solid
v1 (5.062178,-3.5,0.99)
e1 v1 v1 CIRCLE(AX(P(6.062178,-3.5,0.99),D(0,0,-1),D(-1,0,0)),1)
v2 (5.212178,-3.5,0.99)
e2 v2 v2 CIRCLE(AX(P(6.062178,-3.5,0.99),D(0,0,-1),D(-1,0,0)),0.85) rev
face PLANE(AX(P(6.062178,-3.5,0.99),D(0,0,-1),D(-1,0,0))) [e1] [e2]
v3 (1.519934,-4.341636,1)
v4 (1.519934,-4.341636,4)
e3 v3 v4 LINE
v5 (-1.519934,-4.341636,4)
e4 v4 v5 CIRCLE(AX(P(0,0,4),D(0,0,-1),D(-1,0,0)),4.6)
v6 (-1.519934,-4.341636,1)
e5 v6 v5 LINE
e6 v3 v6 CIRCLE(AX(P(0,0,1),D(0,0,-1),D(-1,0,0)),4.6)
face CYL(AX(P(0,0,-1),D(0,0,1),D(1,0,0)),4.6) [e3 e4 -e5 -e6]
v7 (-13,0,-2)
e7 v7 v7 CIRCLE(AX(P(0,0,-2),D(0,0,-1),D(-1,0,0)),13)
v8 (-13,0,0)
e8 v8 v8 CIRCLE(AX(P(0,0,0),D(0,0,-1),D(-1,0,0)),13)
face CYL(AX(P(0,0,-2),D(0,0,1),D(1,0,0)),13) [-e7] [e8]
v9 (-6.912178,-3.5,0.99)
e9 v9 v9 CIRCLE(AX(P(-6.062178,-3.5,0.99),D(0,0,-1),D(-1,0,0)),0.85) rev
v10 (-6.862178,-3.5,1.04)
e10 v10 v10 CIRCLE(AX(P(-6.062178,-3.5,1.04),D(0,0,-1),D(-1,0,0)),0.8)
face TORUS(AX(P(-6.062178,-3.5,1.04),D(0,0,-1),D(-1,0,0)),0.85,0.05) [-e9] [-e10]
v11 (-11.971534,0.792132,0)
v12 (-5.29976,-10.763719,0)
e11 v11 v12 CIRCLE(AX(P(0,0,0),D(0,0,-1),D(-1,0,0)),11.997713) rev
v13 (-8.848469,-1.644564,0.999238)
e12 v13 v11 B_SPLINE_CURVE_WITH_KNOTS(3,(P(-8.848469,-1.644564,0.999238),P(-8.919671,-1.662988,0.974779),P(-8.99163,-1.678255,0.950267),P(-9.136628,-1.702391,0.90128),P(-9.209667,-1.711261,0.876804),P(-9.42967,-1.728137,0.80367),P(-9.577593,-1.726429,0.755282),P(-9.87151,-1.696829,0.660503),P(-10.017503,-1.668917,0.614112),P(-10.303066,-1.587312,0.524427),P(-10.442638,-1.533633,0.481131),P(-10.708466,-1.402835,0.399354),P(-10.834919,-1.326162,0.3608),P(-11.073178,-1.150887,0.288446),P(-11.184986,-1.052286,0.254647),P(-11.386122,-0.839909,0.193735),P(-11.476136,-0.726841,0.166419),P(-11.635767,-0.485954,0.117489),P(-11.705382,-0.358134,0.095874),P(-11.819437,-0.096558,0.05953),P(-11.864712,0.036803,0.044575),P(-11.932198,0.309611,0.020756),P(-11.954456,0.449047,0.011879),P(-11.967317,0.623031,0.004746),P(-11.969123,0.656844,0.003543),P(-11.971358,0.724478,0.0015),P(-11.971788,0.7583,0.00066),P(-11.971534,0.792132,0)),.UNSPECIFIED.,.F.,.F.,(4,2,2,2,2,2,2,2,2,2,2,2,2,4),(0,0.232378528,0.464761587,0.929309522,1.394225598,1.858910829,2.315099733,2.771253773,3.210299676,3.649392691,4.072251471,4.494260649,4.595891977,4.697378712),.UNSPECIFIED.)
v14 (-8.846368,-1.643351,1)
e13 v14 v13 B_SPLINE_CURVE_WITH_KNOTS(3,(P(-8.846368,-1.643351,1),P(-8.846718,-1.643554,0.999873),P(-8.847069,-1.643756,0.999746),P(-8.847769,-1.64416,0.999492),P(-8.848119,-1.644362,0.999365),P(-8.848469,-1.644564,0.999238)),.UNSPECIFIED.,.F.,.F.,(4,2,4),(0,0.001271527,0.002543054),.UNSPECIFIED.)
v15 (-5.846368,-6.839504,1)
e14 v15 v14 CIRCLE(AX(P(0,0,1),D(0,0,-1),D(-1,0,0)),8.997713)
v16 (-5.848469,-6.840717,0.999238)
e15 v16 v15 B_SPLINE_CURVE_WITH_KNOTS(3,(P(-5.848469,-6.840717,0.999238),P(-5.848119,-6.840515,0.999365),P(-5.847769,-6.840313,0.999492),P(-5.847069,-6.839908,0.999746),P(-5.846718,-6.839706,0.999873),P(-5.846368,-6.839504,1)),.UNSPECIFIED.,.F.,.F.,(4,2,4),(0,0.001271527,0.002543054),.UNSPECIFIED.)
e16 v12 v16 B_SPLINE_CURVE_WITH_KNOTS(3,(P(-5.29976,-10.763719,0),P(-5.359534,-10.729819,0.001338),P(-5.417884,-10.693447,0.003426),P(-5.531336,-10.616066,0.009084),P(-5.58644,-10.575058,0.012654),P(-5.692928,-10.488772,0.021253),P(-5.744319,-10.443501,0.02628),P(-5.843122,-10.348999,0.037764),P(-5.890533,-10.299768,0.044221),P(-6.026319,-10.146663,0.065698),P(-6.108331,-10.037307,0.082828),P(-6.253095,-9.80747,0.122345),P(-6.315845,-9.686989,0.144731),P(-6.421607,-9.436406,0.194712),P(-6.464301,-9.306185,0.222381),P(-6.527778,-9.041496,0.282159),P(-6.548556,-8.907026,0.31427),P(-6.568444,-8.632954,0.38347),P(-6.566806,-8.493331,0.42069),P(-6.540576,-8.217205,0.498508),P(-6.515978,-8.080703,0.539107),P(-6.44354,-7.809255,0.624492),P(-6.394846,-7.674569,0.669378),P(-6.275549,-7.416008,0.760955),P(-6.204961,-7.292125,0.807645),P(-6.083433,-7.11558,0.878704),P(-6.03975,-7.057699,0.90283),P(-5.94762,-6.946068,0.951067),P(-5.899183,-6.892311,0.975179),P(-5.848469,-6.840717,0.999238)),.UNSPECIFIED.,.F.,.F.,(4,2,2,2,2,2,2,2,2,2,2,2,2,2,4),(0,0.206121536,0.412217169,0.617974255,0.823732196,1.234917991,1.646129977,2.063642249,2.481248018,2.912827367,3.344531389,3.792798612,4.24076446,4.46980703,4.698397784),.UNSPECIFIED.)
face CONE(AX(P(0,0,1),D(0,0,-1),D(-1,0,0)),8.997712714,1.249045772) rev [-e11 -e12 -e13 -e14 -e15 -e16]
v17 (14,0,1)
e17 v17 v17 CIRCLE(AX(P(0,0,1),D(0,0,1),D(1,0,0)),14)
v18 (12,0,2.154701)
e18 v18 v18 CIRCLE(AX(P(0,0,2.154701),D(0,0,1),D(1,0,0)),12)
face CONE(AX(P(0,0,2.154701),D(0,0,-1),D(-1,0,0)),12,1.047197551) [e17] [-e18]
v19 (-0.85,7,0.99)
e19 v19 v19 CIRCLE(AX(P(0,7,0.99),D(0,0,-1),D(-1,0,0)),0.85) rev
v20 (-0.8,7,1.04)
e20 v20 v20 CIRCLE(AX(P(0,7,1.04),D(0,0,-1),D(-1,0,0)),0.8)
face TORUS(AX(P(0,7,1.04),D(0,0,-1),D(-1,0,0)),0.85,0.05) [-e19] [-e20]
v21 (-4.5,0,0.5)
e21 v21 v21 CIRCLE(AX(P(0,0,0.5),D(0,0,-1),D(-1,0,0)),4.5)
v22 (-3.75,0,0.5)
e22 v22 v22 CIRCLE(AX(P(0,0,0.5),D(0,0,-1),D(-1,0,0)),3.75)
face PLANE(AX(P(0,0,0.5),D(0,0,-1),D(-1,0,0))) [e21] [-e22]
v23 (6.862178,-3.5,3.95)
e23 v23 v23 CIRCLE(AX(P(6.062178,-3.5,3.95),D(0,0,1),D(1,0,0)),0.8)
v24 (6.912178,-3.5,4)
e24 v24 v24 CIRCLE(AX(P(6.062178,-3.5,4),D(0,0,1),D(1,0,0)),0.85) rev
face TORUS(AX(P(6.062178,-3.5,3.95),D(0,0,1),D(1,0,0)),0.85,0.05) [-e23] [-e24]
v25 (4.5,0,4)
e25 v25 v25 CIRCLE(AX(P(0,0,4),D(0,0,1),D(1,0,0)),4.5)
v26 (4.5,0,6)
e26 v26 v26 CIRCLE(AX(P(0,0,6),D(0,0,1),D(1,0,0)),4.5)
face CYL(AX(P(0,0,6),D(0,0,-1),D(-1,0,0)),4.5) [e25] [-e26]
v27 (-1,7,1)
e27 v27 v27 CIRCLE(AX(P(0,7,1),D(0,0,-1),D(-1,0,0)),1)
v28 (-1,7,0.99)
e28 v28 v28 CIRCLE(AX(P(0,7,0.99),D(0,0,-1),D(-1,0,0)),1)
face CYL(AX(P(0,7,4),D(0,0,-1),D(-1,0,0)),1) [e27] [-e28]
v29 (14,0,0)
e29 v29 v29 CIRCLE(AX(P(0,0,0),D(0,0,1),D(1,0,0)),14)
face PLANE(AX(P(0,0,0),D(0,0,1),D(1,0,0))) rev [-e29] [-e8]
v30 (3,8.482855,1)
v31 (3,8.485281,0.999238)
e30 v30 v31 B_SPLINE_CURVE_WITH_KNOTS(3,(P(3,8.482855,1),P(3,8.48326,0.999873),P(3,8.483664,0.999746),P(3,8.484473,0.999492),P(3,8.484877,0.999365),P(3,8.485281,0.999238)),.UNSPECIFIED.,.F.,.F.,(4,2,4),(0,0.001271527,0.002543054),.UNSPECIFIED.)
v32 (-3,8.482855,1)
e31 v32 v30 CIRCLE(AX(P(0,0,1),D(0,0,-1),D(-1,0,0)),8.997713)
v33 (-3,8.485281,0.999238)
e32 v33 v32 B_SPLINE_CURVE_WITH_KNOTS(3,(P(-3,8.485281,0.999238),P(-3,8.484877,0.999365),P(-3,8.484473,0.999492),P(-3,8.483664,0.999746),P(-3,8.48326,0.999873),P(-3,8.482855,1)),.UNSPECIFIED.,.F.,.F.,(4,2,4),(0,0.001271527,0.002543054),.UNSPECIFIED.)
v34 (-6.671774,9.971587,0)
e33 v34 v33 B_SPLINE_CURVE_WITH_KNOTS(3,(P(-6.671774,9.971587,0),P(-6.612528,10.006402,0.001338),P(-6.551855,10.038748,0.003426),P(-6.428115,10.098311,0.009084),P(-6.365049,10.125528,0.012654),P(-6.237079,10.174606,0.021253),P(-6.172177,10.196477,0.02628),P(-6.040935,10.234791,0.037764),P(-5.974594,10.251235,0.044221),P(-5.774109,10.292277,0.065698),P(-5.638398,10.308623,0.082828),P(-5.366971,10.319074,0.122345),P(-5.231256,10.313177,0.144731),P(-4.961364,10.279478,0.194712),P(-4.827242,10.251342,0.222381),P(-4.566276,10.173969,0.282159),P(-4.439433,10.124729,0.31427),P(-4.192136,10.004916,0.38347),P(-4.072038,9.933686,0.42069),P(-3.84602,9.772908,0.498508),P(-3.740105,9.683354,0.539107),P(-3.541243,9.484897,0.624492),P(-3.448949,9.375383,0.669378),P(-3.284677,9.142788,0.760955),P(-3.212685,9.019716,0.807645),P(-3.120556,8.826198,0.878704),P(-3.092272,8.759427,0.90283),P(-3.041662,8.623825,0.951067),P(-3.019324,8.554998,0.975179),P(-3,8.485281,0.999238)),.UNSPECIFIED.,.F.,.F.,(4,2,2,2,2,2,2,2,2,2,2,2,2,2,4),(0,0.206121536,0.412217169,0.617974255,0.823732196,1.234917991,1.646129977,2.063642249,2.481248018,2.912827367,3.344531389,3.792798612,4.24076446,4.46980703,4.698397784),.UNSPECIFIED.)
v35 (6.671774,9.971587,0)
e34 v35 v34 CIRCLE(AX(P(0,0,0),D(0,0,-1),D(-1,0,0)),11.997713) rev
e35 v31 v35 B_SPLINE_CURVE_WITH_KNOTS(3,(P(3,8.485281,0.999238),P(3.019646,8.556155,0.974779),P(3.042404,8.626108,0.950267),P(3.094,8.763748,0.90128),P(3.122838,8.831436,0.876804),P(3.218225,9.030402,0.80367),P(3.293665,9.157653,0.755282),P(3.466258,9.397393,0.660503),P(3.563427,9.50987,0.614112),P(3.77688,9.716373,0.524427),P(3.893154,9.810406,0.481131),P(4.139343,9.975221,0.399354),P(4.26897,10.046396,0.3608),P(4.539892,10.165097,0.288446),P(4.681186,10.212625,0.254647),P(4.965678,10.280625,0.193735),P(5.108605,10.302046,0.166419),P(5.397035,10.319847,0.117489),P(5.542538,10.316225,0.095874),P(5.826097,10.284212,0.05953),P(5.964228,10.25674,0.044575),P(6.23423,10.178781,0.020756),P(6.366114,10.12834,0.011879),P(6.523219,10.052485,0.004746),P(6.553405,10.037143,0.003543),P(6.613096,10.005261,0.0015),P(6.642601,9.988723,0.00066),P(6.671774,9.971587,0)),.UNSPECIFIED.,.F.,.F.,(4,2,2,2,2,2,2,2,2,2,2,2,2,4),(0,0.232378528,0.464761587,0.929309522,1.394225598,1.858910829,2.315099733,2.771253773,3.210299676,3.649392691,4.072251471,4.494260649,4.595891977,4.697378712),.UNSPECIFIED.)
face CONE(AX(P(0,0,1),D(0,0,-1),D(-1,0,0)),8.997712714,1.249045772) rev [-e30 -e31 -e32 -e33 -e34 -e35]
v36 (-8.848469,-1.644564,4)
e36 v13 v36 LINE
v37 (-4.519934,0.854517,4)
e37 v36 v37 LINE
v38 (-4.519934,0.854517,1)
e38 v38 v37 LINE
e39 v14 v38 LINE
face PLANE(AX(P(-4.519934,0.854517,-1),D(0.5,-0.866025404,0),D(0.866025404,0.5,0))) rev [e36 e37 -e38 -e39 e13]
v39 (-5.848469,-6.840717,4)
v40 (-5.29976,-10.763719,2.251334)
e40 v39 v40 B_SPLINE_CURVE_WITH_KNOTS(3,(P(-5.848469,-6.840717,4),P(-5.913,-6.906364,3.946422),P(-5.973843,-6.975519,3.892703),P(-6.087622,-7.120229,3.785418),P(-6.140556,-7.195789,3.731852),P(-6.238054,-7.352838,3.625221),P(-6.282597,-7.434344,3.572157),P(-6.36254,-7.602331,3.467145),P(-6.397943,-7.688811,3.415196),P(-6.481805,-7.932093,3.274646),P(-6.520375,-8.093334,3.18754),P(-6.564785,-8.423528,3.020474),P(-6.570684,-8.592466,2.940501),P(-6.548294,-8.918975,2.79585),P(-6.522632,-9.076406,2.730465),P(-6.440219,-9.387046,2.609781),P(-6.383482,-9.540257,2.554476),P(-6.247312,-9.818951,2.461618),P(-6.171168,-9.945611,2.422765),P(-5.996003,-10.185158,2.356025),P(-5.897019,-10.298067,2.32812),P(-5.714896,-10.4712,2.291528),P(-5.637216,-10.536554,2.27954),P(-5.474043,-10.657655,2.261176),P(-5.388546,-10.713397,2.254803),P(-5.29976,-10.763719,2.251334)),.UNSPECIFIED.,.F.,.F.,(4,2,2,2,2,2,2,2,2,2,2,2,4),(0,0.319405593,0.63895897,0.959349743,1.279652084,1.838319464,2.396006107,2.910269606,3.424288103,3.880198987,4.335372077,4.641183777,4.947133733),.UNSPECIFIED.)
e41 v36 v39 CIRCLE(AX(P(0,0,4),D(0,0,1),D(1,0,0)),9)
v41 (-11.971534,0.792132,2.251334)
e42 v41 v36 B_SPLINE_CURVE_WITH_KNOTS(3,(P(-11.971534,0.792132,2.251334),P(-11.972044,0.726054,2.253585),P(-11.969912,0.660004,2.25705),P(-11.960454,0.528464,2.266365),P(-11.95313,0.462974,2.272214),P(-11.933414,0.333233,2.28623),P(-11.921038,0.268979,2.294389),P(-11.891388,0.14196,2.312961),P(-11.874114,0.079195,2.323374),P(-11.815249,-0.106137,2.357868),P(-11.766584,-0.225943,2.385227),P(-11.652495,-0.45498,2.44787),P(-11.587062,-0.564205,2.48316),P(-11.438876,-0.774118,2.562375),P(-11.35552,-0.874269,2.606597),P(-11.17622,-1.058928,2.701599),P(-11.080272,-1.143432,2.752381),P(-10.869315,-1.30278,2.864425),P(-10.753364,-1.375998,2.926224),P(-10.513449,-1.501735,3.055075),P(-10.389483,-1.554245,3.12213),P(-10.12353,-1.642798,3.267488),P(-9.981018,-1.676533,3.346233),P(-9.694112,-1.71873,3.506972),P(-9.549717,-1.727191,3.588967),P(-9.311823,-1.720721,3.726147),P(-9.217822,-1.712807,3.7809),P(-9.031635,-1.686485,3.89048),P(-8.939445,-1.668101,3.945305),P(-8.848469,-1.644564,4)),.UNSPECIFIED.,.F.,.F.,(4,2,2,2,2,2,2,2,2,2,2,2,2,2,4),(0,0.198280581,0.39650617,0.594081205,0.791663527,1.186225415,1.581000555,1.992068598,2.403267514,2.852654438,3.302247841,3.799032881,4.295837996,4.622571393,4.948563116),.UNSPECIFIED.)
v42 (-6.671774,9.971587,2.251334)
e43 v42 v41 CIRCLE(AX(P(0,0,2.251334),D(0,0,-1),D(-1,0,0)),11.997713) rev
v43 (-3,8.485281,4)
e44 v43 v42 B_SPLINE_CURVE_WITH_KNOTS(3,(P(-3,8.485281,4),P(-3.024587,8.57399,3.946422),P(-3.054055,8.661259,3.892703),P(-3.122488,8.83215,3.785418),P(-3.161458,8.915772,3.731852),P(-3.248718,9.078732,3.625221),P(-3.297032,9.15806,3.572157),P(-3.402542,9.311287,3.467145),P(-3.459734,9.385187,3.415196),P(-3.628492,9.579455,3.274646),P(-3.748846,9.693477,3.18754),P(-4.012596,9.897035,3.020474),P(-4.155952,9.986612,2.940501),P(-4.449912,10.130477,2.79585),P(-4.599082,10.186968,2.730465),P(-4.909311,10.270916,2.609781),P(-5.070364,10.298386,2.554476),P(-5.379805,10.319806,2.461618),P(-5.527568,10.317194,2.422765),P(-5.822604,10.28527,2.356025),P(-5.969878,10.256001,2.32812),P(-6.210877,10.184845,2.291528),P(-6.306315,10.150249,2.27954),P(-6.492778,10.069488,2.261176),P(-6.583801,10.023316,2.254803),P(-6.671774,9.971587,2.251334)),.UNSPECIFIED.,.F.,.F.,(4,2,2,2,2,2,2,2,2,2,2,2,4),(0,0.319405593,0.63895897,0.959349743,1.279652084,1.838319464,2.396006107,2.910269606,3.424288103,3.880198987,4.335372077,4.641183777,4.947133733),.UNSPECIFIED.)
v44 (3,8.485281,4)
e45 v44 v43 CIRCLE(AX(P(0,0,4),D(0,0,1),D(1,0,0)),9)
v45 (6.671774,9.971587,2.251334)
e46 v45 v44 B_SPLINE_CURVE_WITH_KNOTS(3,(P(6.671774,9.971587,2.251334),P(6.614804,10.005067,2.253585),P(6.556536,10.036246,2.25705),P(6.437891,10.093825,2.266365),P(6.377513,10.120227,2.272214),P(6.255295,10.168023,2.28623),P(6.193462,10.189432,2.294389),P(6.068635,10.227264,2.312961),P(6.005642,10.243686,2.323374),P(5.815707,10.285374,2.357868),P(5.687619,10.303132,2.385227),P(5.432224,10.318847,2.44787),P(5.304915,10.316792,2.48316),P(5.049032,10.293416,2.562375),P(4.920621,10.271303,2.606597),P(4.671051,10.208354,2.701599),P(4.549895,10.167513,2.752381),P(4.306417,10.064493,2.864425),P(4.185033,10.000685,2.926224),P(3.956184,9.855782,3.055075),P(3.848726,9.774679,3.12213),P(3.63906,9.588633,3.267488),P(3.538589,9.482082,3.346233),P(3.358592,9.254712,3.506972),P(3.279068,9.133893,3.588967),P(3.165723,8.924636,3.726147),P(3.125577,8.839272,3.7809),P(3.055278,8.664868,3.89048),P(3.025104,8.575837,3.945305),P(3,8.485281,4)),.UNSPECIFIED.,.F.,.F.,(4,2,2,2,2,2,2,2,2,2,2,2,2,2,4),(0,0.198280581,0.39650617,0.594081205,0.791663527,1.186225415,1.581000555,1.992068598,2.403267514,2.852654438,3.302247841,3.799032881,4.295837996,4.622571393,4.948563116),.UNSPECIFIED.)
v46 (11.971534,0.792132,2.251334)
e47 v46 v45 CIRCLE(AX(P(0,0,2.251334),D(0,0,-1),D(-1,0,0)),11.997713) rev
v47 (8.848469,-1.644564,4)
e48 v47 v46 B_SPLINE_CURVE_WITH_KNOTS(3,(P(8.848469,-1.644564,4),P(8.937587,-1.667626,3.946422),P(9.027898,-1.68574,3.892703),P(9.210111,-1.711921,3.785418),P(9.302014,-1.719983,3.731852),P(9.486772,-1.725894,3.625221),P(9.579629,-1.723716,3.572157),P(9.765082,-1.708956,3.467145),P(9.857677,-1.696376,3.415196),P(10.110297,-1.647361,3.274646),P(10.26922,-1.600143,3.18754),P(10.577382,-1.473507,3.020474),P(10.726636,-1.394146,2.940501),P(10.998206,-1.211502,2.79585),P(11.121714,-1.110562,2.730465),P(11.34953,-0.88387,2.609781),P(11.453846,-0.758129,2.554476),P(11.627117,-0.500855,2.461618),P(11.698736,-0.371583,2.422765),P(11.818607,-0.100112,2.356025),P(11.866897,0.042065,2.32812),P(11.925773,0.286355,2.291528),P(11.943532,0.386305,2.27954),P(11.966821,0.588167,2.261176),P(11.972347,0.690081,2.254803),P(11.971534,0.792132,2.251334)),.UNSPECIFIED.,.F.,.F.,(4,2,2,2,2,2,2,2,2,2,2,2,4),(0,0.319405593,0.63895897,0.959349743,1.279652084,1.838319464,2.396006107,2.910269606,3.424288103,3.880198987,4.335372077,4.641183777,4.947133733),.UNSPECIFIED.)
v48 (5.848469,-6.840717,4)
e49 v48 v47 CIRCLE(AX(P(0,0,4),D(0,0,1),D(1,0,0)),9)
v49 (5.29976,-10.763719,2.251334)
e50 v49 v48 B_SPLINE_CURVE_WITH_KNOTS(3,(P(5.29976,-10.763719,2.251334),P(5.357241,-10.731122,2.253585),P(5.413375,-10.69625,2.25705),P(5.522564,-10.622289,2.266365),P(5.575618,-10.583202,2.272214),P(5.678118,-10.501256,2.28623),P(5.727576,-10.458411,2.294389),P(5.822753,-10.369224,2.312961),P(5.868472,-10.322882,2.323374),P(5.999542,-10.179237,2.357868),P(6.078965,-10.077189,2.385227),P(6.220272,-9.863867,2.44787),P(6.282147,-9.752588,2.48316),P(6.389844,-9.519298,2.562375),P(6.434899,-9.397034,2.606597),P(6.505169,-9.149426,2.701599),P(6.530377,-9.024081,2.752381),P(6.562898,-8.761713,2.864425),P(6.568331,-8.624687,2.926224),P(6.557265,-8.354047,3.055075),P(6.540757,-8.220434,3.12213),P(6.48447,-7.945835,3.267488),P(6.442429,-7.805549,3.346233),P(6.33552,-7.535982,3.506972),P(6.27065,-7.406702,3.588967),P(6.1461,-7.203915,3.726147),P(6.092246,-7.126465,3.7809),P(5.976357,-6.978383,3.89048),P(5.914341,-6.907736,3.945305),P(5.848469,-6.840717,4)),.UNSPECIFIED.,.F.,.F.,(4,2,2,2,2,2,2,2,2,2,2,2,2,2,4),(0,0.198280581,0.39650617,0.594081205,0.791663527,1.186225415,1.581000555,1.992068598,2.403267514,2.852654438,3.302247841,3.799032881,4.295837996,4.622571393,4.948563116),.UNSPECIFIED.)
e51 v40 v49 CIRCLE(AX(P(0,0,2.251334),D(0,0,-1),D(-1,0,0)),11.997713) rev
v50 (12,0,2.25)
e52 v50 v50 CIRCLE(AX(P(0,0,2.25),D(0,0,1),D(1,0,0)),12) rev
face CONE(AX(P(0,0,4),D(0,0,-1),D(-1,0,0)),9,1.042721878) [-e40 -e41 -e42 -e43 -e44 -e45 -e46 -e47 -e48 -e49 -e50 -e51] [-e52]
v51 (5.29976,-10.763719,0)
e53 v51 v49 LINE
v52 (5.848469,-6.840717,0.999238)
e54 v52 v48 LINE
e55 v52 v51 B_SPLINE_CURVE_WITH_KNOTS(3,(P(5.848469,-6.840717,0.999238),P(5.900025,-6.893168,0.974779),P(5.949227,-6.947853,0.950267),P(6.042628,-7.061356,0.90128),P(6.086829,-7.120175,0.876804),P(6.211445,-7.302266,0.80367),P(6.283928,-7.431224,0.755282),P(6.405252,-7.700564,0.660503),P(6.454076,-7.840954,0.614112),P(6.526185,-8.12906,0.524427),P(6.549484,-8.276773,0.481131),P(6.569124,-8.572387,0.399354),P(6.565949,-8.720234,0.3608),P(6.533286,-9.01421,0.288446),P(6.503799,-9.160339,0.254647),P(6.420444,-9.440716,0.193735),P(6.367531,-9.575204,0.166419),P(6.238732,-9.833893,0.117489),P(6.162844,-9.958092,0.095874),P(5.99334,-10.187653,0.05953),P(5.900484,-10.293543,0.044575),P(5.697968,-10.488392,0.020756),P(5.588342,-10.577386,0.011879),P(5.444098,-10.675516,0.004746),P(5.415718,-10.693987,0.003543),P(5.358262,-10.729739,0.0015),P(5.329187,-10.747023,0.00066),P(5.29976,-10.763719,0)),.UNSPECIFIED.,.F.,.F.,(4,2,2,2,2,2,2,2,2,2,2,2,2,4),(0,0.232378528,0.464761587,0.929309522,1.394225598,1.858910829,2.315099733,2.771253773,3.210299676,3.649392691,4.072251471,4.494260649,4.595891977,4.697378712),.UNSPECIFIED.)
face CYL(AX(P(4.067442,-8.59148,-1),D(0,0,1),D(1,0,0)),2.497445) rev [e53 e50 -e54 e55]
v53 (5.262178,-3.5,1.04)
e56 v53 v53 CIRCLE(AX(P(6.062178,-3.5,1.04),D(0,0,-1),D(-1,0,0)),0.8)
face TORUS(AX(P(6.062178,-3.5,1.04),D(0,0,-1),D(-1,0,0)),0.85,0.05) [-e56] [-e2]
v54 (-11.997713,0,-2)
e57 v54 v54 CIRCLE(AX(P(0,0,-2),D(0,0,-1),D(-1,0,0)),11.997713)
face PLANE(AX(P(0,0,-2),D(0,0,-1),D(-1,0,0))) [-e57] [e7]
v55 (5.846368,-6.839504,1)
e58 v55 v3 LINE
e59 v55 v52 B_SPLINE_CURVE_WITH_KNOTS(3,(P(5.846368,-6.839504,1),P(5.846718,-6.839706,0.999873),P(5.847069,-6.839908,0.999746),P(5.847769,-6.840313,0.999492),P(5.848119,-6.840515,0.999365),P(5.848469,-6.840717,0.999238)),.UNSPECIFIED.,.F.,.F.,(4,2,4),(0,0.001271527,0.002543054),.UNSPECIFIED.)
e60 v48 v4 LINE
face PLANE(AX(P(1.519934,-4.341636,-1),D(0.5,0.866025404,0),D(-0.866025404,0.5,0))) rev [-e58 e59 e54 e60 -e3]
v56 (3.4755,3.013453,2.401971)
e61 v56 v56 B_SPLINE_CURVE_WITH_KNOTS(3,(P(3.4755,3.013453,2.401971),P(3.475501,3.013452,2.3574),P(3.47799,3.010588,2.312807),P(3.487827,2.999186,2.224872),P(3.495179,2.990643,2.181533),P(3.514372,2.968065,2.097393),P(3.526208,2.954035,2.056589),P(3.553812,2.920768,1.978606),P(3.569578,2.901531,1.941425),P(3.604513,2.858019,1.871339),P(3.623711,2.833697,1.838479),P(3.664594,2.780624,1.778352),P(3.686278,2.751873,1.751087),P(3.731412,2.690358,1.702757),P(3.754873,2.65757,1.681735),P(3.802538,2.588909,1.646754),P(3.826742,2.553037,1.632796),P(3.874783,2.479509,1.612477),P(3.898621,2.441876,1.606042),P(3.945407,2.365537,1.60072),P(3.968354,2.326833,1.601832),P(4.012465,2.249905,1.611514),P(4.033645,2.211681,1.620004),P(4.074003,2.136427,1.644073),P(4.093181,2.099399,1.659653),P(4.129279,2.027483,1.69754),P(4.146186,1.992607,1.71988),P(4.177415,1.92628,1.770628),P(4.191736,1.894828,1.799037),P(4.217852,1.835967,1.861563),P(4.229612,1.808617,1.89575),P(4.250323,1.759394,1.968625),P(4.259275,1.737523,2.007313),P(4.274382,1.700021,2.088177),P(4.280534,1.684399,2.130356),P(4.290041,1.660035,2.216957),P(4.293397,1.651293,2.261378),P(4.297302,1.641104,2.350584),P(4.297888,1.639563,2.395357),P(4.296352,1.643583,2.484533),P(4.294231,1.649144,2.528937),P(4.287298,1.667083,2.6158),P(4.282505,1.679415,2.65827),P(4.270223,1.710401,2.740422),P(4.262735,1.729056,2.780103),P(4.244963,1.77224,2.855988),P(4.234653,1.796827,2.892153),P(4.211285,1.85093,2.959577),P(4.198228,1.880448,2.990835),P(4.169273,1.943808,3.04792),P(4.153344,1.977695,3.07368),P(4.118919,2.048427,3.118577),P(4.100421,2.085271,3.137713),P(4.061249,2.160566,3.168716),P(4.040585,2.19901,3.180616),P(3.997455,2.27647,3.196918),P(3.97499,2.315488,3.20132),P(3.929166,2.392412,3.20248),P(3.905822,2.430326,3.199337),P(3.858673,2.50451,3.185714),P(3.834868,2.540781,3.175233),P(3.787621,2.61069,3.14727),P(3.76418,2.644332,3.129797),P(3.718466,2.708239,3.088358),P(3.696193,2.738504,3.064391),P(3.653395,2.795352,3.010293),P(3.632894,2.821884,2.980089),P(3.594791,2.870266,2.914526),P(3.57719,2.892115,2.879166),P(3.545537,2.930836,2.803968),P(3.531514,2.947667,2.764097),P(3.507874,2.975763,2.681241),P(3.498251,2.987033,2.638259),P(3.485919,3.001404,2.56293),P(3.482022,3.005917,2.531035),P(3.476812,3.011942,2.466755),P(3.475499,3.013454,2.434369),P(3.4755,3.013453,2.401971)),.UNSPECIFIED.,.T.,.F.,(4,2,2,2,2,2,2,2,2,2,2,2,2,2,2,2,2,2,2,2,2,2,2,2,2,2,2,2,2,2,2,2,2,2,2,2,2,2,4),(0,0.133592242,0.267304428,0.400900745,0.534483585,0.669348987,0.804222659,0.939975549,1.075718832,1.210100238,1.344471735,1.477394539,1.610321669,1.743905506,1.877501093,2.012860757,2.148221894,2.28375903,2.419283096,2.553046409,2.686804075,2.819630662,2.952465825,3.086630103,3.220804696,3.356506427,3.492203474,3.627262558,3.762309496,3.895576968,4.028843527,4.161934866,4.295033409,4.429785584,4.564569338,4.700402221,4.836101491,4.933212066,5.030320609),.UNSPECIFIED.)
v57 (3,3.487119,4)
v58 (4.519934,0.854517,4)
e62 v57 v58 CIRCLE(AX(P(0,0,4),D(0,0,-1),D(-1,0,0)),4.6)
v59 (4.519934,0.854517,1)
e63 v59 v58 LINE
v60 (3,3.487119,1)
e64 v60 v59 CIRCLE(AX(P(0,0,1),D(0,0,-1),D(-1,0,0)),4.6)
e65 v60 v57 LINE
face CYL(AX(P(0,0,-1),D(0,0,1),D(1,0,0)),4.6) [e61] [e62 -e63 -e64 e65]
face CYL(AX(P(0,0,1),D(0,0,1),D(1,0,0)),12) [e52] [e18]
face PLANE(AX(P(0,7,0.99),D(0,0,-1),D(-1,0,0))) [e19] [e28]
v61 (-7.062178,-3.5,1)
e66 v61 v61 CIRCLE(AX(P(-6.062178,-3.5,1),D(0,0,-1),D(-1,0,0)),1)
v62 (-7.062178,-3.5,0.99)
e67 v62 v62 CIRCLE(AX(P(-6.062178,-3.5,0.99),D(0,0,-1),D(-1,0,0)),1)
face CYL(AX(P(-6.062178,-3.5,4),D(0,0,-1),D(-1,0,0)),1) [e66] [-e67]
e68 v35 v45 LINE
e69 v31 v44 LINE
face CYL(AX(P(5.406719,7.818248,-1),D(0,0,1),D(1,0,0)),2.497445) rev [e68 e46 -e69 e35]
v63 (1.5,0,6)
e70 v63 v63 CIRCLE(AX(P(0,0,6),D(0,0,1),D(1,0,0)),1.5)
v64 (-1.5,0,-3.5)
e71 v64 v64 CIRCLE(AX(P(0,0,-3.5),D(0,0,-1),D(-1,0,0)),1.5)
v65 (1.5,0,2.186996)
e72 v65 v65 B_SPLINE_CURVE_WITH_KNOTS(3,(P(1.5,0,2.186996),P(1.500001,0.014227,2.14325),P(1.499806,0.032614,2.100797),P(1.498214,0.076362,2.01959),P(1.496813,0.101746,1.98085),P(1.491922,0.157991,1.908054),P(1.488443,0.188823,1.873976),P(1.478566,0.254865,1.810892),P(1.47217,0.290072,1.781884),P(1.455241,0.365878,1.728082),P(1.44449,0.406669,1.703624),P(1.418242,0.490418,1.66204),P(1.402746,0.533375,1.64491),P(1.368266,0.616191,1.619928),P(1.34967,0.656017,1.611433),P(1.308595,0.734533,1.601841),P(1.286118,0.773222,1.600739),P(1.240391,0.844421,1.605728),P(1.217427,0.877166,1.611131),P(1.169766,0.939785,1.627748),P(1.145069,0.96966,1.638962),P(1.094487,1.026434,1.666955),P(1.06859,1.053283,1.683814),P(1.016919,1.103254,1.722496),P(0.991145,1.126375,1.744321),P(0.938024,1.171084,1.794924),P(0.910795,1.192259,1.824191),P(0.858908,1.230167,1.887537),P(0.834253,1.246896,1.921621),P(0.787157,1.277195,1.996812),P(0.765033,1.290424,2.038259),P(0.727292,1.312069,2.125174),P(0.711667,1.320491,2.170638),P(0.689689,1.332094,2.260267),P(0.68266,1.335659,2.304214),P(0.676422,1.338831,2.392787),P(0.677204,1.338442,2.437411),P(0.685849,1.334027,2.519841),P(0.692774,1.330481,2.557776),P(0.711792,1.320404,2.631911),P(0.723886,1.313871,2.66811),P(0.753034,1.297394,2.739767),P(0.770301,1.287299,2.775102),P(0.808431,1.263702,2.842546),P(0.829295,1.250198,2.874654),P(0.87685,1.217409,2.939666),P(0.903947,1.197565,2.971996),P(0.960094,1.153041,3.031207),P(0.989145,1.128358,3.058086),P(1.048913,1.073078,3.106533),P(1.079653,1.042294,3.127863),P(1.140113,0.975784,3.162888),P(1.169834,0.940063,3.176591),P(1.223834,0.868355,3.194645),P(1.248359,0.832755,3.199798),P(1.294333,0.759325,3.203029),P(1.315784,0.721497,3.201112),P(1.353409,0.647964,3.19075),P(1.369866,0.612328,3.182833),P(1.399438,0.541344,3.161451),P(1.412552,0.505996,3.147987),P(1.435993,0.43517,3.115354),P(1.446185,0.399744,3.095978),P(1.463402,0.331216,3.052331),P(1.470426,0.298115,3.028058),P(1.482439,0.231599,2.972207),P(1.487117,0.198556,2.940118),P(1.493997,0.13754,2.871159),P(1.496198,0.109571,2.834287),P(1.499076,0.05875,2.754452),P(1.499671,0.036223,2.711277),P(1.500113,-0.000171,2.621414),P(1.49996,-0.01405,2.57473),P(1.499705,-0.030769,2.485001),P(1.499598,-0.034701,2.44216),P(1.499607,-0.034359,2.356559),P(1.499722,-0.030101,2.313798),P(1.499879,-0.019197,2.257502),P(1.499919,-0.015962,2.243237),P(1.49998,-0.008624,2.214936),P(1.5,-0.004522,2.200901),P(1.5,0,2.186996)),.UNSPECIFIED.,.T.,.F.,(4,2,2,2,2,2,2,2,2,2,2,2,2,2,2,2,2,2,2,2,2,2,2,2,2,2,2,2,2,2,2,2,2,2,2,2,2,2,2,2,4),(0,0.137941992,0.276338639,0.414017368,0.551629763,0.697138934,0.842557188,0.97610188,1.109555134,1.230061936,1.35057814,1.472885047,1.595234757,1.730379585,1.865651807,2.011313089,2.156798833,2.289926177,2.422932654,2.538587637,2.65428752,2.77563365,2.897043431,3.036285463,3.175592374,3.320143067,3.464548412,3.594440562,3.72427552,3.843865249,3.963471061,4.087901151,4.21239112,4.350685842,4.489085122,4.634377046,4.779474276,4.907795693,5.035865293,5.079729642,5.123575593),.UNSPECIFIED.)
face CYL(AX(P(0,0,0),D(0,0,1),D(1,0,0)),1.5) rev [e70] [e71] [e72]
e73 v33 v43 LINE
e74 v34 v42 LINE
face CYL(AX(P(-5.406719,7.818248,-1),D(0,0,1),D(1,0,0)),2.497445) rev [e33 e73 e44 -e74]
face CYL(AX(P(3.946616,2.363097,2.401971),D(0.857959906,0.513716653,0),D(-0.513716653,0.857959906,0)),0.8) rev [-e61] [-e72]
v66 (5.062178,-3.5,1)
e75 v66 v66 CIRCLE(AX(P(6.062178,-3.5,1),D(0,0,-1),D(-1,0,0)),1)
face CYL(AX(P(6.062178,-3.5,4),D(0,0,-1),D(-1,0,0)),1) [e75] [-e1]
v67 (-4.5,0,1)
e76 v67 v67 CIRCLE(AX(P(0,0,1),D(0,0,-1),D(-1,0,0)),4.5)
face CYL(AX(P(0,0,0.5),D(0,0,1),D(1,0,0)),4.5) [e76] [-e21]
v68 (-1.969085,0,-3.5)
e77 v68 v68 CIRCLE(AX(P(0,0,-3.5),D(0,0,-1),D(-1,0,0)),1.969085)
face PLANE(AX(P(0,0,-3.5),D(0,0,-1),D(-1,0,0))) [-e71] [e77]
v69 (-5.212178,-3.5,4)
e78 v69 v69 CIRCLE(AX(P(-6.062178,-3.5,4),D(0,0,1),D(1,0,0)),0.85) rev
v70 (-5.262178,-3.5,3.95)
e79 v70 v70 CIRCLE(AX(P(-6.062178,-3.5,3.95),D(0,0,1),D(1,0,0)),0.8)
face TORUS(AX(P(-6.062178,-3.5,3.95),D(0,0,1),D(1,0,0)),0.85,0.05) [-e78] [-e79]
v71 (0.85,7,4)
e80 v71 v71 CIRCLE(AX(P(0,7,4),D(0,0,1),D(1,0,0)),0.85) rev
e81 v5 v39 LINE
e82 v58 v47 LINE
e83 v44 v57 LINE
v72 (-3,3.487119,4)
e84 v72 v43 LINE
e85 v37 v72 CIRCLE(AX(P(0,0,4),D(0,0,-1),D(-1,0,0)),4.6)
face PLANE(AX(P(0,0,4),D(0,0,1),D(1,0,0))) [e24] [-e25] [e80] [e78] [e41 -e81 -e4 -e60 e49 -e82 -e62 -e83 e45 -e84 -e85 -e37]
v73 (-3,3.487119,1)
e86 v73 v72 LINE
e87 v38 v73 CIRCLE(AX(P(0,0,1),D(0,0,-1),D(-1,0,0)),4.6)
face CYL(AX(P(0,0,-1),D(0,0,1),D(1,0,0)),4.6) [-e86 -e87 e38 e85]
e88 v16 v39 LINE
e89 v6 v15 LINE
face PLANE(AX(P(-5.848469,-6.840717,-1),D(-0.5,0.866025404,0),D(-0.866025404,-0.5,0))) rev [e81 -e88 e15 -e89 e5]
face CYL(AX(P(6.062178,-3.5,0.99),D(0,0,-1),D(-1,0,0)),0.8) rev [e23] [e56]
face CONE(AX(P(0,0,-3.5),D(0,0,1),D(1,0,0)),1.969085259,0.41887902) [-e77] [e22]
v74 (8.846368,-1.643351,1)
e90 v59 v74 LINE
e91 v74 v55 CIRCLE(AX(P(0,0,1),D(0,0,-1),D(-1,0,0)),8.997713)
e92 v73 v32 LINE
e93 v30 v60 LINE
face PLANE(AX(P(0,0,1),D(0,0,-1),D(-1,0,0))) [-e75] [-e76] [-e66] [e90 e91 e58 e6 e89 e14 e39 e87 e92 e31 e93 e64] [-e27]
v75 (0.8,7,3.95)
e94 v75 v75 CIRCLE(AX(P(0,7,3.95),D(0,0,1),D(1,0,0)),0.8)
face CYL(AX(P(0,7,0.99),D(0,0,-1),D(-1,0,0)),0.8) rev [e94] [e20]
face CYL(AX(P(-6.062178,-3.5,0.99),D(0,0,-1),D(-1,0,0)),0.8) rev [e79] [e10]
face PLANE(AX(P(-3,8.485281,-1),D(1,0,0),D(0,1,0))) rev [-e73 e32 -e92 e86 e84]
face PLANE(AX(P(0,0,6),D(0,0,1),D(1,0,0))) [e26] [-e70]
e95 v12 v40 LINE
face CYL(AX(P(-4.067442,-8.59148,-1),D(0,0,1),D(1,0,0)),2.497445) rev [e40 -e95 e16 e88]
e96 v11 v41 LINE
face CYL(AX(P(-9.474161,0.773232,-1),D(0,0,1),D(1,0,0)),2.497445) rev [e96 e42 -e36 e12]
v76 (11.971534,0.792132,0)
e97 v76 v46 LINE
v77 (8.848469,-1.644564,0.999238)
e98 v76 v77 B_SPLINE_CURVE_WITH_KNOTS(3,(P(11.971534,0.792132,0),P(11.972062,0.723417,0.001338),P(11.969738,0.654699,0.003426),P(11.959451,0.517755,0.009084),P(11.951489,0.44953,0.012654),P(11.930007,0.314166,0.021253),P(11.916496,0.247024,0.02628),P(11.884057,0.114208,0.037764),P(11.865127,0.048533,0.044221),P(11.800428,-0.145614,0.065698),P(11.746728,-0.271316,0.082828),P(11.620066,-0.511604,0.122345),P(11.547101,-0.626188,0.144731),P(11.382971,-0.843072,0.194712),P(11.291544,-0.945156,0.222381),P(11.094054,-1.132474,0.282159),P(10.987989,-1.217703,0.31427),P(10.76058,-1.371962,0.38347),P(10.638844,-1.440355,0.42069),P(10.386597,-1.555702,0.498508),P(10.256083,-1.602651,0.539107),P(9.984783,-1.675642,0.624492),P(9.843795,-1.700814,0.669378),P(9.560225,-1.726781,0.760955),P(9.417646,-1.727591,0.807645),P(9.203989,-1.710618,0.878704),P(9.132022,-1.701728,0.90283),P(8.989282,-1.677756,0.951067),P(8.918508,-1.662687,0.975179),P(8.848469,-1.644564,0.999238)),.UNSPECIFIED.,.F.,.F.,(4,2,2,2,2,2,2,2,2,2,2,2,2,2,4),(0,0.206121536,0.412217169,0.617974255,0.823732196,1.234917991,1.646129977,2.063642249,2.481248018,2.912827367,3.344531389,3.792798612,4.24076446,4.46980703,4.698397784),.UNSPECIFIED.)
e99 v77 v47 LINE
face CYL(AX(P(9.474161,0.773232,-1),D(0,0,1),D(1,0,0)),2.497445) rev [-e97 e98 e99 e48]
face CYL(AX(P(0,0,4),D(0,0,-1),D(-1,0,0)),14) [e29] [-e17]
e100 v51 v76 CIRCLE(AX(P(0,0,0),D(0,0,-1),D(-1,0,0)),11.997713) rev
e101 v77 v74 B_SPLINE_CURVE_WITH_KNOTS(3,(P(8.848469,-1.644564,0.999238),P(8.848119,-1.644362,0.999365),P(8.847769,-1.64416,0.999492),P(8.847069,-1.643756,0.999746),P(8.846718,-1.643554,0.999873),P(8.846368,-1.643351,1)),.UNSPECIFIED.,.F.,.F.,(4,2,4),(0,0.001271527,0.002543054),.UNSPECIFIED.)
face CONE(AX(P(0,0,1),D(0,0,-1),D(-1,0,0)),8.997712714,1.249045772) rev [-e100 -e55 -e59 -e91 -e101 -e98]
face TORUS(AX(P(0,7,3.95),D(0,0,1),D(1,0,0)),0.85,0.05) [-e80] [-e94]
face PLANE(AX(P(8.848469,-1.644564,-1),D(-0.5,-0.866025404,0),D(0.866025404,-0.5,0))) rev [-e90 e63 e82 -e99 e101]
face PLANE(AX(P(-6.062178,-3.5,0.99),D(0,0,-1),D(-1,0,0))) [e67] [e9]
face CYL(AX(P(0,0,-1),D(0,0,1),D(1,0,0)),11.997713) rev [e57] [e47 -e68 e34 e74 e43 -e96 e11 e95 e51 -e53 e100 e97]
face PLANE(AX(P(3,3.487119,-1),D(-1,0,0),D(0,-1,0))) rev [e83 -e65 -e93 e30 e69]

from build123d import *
from build123d.topology import SkipClean

# Parameters (mm, degrees)
SKETCH1_R                       = 14
BOSS_EXTRUDE1_DEPTH             = 4
SKETCH2_R                       = 1
CUT_EXTRUDE2_DEPTH              = 5
CUT_EXTRUDE4_DEPTH              = 5
SKETCH6_R                       = 4.5
BOSS_EXTRUDE2_DEPTH             = 2
SKETCH7_R                       = 13
SKETCH7_R_2                     = 11.997712714
BOSS_EXTRUDE3_DEPTH             = 2
CUT_EXTRUDE8_START              = -3
SKETCH9_R                       = 14
SKETCH9_R_2                     = 12
CUT_EXTRUDE8_DEPTH              = 3
CHAMFER2_SIZE                   = 2
CHAMFER2_SIZE_2                 = 1.154700538
CHAMFER6_SIZE                   = 1.75
CHAMFER6_SIZE_2                 = 3
SKETCH12_R                      = 1.5
CUT_EXTRUDE9_DEPTH              = 6
CUT_EXTRUDE11_START             = -1
SKETCH13_R                      = 11.997712714
CUT_EXTRUDE11_DEPTH             = 1
CHAMFER7_START                  = -1e-07
CHAMFER7_DEPTH                  = 1.0000001
CHAMFER7_START_2                = -2.0000001
CHAMFER7_3_DEPTH                = 3.0000001
BOSS_EXTRUDE5_START             = 0.5
SKETCH14_R                      = 4.5
BOSS_EXTRUDE5_DEPTH             = 0.5
SKETCH15_R                      = 3.75
BOSS_EXTRUDE7_DEPTH             = 4
CHAMFER9_SIZE                   = 4
CHAMFER9_SIZE_2                 = 1.780914741
CUT_EXTRUDE12_START             = -7
SKETCH18_R                      = 1.5
CUT_EXTRUDE12_DEPTH             = 7
BOSS_EXTRUDE8_DEPTH             = 0.01
BOSS_EXTRUDE8_DEPTH_BACK        = 3
SKETCH22_R                      = 1
BOSS_EXTRUDE9_DEPTH             = 0.01
BOSS_EXTRUDE9_DEPTH_BACK        = 3
SKETCH23_R                      = 1
BOSS_EXTRUDE10_DEPTH            = 0.01
BOSS_EXTRUDE10_DEPTH_BACK       = 3
SKETCH24_R                      = 1
TAP_DRILL_FOR_M2X0_4_TAP4_D     = 1.6
TAP_DRILL_FOR_M2X0_4_TAP4_DEPTH = 10
TAP_DRILL_FOR_M2X0_4_TAP4_TIP   = 0.480688495
FILLET1_R                       = 0.05
TAP_DRILL_FOR_M2X0_4_TAP6_D     = 1.6
TAP_DRILL_FOR_M2X0_4_TAP6_DEPTH = 4
TAP_DRILL_FOR_M2X0_4_TAP6_TIP   = 0.480688495


with BuildPart() as part:
    # Sketch1 → Boss-Extrude1 (new body)
    with BuildSketch(Plane.XY):
        Circle(SKETCH1_R)
    extrude(amount=BOSS_EXTRUDE1_DEPTH)

    # Sketch2 → Cut-Extrude2 (cut)
    with BuildSketch(Plane.XY.offset(4)):
        with Locations((0, 7)):
            Circle(SKETCH2_R)
        with Locations((6.062177826, -3.5)):
            Circle(SKETCH2_R)
        with Locations((-6.062177826, -3.5)):
            Circle(SKETCH2_R)
    extrude(amount=-CUT_EXTRUDE2_DEPTH, mode=Mode.SUBTRACT)

    # Sketch4 → Cut-Extrude4 (cut)
    with BuildSketch(Plane.XY.offset(4)):
        with BuildLine():
            Line((-3, 8.485281374), (-3, 3.487119155))
            ThreePointArc((-3, 3.487119155), (-3.983716857, 2.3), (-4.519933774, 0.854516634))
            Line((-4.519933774, 0.854516634), (-8.848469228, -1.644564476))
            ThreePointArc((-8.848469228, -1.644564476), (-11.010445776, -1.195792963), (-11.971534434, 0.792132351))
            ThreePointArc((-11.971534434, 0.792132351), (-10.390323998, 5.998856357), (-6.671773957, 9.971586766))
            ThreePointArc((-6.671773957, 9.971586766), (-4.469635805, 10.13322223), (-3, 8.485281374))
        make_face()
        with BuildLine():
            Line((8.848469228, -1.644564476), (4.519933774, 0.854516634))
            ThreePointArc((4.519933774, 0.854516634), (3.983716857, 2.3), (3, 3.487119155))
            Line((3, 3.487119155), (3, 8.485281374))
            ThreePointArc((3, 8.485281374), (4.469635805, 10.13322223), (6.671773956, 9.971586766))
            ThreePointArc((6.671773956, 9.971586766), (10.390323997, 5.998856357), (11.971534434, 0.792132352))
            ThreePointArc((11.971534434, 0.792132352), (11.010445776, -1.195792963), (8.848469228, -1.644564476))
        make_face()
        with BuildLine():
            Line((-5.848469228, -6.840716898), (-1.519933774, -4.341635789))
            ThreePointArc((-1.519933774, -4.341635789), (0, -4.6), (1.519933774, -4.341635789))
            Line((1.519933774, -4.341635789), (5.848469228, -6.840716898))
            ThreePointArc((5.848469228, -6.840716898), (6.540809971, -8.937429267), (5.299760478, -10.763719118))
            ThreePointArc((5.299760478, -10.763719118), (0, -11.997712714), (-5.299760477, -10.763719118))
            ThreePointArc((-5.299760477, -10.763719118), (-6.540809971, -8.937429268), (-5.848469228, -6.840716898))
        make_face()
    extrude(amount=-CUT_EXTRUDE4_DEPTH, mode=Mode.SUBTRACT)

    # Sketch6 → Boss-Extrude2 (add)
    with BuildSketch(Plane.XY.offset(4)):
        Circle(SKETCH6_R)
    extrude(amount=BOSS_EXTRUDE2_DEPTH)

    # Sketch7 → Boss-Extrude3 (add)
    with SkipClean():  # the faces are left unmerged after this step: merging them gives an invalid solid
        with BuildSketch(Plane(origin=(0, 0, 0), x_dir=(-1, 0, 0), z_dir=(0, 0, -1))):
            Circle(SKETCH7_R)
            with Locations(Location((0, 0, 0), (0, 0, 176.214371839))):
                Circle(SKETCH7_R_2, mode=Mode.SUBTRACT)
        extrude(amount=BOSS_EXTRUDE3_DEPTH)

    # Sketch9 → Cut-Extrude8 (cut)
    with BuildSketch(Plane.XY.offset(4).offset(CUT_EXTRUDE8_START)):
        Circle(SKETCH9_R)
        Circle(SKETCH9_R_2, mode=Mode.SUBTRACT)
    extrude(amount=CUT_EXTRUDE8_DEPTH, mode=Mode.SUBTRACT)

    # Chamfer2
    # the kernel refuses this chamfer: 2, 1.154700538 mm, written as the material it adds along each edge
    with BuildSketch(Plane(origin=(0, 0, 1), x_dir=(1, 0, 0), z_dir=(0, -1, 0))) as chamfer2_piece_1_section:
        Polygon((12 + CHAMFER2_SIZE, 0), (12, CHAMFER2_SIZE_2), (12, 0), align=None)
    chamfer2_piece_1 = revolve(axis=Axis((0, 0, 1), (0, 0, 1)), mode=Mode.PRIVATE)
    chamfer2_piece_1 = chamfer2_piece_1 & Plane(origin=(0, 0, 1), x_dir=(1, 0, 0), z_dir=(0, 0, -1)) * Cylinder(14, 56, mode=Mode.PRIVATE)
    add(chamfer2_piece_1)

    # Chamfer6
    # the kernel refuses this chamfer: 3, 1.75 mm, written as the material it takes off along each edge
    with BuildSketch(Plane(origin=(0, 0, 4), x_dir=(1, 0, 0), z_dir=(0, -1, 0))) as chamfer6_piece_1:
        Polygon((12, -CHAMFER6_SIZE), (12 - CHAMFER6_SIZE_2, 0), (12, 0), align=None)
    revolve(axis=Axis((0, 0, 4), (0, 0, 1)), mode=Mode.SUBTRACT)

    # Sketch12 → Cut-Extrude9 (cut)
    with SkipClean():  # the faces are left unmerged after this step: merging them gives an invalid solid
        with BuildSketch(Plane.XY.offset(6)):
            Circle(SKETCH12_R)
        extrude(amount=-CUT_EXTRUDE9_DEPTH, mode=Mode.SUBTRACT)

    # Sketch13 → Cut-Extrude11 (cut)
    with SkipClean():  # the faces are left unmerged after this step: merging them gives an invalid solid
        with BuildSketch(Plane(origin=(0, 0, 0), x_dir=(-1, 0, 0), z_dir=(0, 0, -1)).offset(CUT_EXTRUDE11_START)):
            with Locations(Location((0, 0, 0), (0, 0, 176.214371839))):
                Circle(SKETCH13_R)
        extrude(amount=CUT_EXTRUDE11_DEPTH, mode=Mode.SUBTRACT)

    # Chamfer7: read off the stored shape, not the designer's step
    # Chamfer7 outline → Chamfer7 (add)
    with BuildSketch(Plane.XY.offset(CHAMFER7_START)):
        with BuildLine():
            ThreePointArc((5.299760478, -10.763719118), (10.390323998, -5.998856357), (11.971534434, 0.792132352))
            ThreePointArc((11.971534434, 0.792132352), (10.390323997, 5.998856357), (6.671773956, 9.971586767))
            ThreePointArc((6.671773956, 9.971586767), (0, 11.997712714), (-6.671773957, 9.971586766))
            ThreePointArc((-6.671773957, 9.971586766), (-10.390323998, 5.998856357), (-11.971534434, 0.792132351))
            ThreePointArc((-11.971534434, 0.792132351), (-10.390323997, -5.998856357), (-5.299760477, -10.763719118))
            ThreePointArc((-5.299760477, -10.763719118), (0, -11.997712714), (5.299760478, -10.763719118))
        make_face()
    extrude(amount=CHAMFER7_DEPTH)

    # Chamfer7 2 outline → Chamfer7 2 (revolve, cut)
    with BuildSketch(Plane.XZ):
        Polygon((0, 0), (11.997712714, 0), (8.997712714, 1), (0, 1), align=None)
    revolve(axis=Axis((0, 0, 0), (0, 0, 1)), mode=Mode.SUBTRACT)

    # Chamfer7 3 outline → Chamfer7 3 (cut)
    with SkipClean():  # the faces are left unmerged after this step: merging them gives an invalid solid
        with BuildSketch(Plane.XY.offset(CHAMFER7_START_2)):
            with BuildLine():
                ThreePointArc((-11.971534434, 0.792132351), (-11.010445776, -1.195792963), (-8.848469228, -1.644564476))
                Line((-8.848469228, -1.644564476), (-1.204041756, 0.333705757))
                Line((-1.204041756, 0.333705757), (-2.025634145, 1.169500422))
                Line((-2.025634145, 1.169500422), (-0.891018539, 0.875877873))
                Line((-0.891018539, 0.875877873), (-3, 8.485281374))
                ThreePointArc((-3, 8.485281374), (-4.469635805, 10.13322223), (-6.671773957, 9.971586766))
                ThreePointArc((-6.671773957, 9.971586766), (-10.390323998, 5.998856357), (-11.971534434, 0.792132351))
            make_face()
            with BuildLine():
                ThreePointArc((-5.848469228, -6.840716898), (-6.540809971, -8.937429267), (-5.299760477, -10.763719118))
                ThreePointArc((-5.299760477, -10.763719118), (0, -11.997712714), (5.299760478, -10.763719118))
                ThreePointArc((5.299760478, -10.763719118), (6.540809971, -8.937429267), (5.848469228, -6.840716898))
                Line((5.848469228, -6.840716898), (0.313023217, -1.209583624))
                Line((0.313023217, -1.209583624), (1e-09, -2.339000836))
                Line((1e-09, -2.339000836), (-0.313023216, -1.209583625))
                Line((-0.313023216, -1.209583625), (-5.848469228, -6.840716898))
            make_face()
            with BuildLine():
                ThreePointArc((6.671773956, 9.971586766), (4.469635804, 10.13322223), (3, 8.485281374))
                Line((3, 8.485281374), (0.89101854, 0.875877873))
                Line((0.89101854, 0.875877873), (2.025634151, 1.169500423))
                Line((2.025634151, 1.169500423), (1.204041758, 0.333705756))
                Line((1.204041758, 0.333705756), (8.848469228, -1.644564476))
                ThreePointArc((8.848469228, -1.644564476), (11.010445776, -1.195792963), (11.971534434, 0.792132352))
                ThreePointArc((11.971534434, 0.792132352), (10.390323997, 5.998856357), (6.671773956, 9.971586766))
            make_face()
        extrude(amount=CHAMFER7_3_DEPTH, mode=Mode.SUBTRACT)

    # Sketch14 → Boss-Extrude5 (add)
    with SkipClean():  # the faces are left unmerged after this step: merging them gives an invalid solid
        with BuildSketch(Plane(origin=(0, 0, 1), x_dir=(-1, 0, 0), z_dir=(0, 0, -1)).offset(BOSS_EXTRUDE5_START)):
            with Locations(Location((0, 0, 0), (0, 0, 180))):
                Circle(SKETCH14_R)
        extrude(amount=-BOSS_EXTRUDE5_DEPTH)

    # Sketch15 → Boss-Extrude7 (add)
    with SkipClean():  # the faces are left unmerged after this step: merging them gives an invalid solid
        with BuildSketch(Plane(origin=(0, 0, 0.5), x_dir=(-1, 0, 0), z_dir=(0, 0, -1))):
            Circle(SKETCH15_R)
        extrude(amount=BOSS_EXTRUDE7_DEPTH)

    # Chamfer9
    # the kernel refuses this chamfer: 4, 1.780914741 mm, written as the material it takes off along each edge
    with BuildSketch(Plane(origin=(0, 0, -3.5), x_dir=(-1, 0, 0), z_dir=(0, -1, 0))) as chamfer9_piece_1_section:
        Polygon((3.75, -CHAMFER9_SIZE), (3.75 - CHAMFER9_SIZE_2, 0), (3.75, 0), align=None)
    chamfer9_piece_1 = revolve(axis=Axis((0, 0, -3.5), (0, 0, -1)), mode=Mode.PRIVATE)
    chamfer9_piece_1 = split(chamfer9_piece_1, bisect_by=Plane(origin=(0, 0, 0.5), z_dir=(0, 0, -1)), keep=Keep.TOP, mode=Mode.PRIVATE)
    add(chamfer9_piece_1, mode=Mode.SUBTRACT)

    # Sketch18 → Cut-Extrude12 (cut)
    with SkipClean():  # the faces are left unmerged after this step: merging them gives an invalid solid
        with BuildSketch(Plane(origin=(0, 0, -3.5), x_dir=(-1, 0, 0), z_dir=(0, 0, -1)).offset(CUT_EXTRUDE12_START)):
            with Locations(Location((0, 0, 0), (0, 0, 180))):
                Circle(SKETCH18_R)
        extrude(amount=CUT_EXTRUDE12_DEPTH, mode=Mode.SUBTRACT)

    # Sketch22 → Boss-Extrude8 (add, two sides: drawn at the far end of the back side and taken through both)
    with SkipClean():  # the faces are left unmerged after this step: merging them gives an invalid solid
        with BuildSketch(Plane(origin=(0, 0, 1), x_dir=(-1, 0, 0), z_dir=(0, 0, -1)).offset(-BOSS_EXTRUDE8_DEPTH_BACK)):
            with Locations((6.062177826, -3.5)):
                Circle(SKETCH22_R)
        extrude(amount=BOSS_EXTRUDE8_DEPTH + BOSS_EXTRUDE8_DEPTH_BACK)

    # Sketch23 → Boss-Extrude9 (add, two sides: drawn at the far end of the back side and taken through both)
    with SkipClean():  # the faces are left unmerged after this step: merging them gives an invalid solid
        with BuildSketch(Plane(origin=(0, 0, 1), x_dir=(-1, 0, 0), z_dir=(0, 0, -1)).offset(-BOSS_EXTRUDE9_DEPTH_BACK)):
            with Locations((0, 7)):
                Circle(SKETCH23_R)
        extrude(amount=BOSS_EXTRUDE9_DEPTH + BOSS_EXTRUDE9_DEPTH_BACK)

    # Sketch24 → Boss-Extrude10 (add, two sides: drawn at the far end of the back side and taken through both)
    with SkipClean():  # the faces are left unmerged after this step: merging them gives an invalid solid
        with BuildSketch(Plane(origin=(0, 0, 1), x_dir=(-1, 0, 0), z_dir=(0, 0, -1)).offset(-BOSS_EXTRUDE10_DEPTH_BACK)):
            with Locations((-6.062177826, -3.5)):
                Circle(SKETCH24_R)
        extrude(amount=BOSS_EXTRUDE10_DEPTH + BOSS_EXTRUDE10_DEPTH_BACK)

    # Tap Drill for M2x0.4 Tap4
    with Locations(Plane(origin=(0, 0, 0.99), x_dir=(-1, 0, 0), z_dir=(0, 0, -1))):
        with Locations((0, 7), (6.062177826, -3.5), (-6.062177826, -3.5)):
            Hole(TAP_DRILL_FOR_M2X0_4_TAP4_D / 2, depth=TAP_DRILL_FOR_M2X0_4_TAP4_DEPTH)
            with Locations((0, 0, -(TAP_DRILL_FOR_M2X0_4_TAP4_DEPTH + TAP_DRILL_FOR_M2X0_4_TAP4_TIP / 2))):  # 118° drill point
                Cone(0, TAP_DRILL_FOR_M2X0_4_TAP4_D / 2, TAP_DRILL_FOR_M2X0_4_TAP4_TIP, mode=Mode.SUBTRACT)

    # Fillet1
    fillet1_edges = [part.edges().sort_by_distance(p)[0] for p in [
        (5.262177826, -3.5, 4),
        (5.262177826, -3.5, 0.99),
        (-6.862177826, -3.5, 4),
        (-6.862177826, -3.5, 0.99),
        (-0.8, 7, 4),
        (-0.8, 7, 0.99),
    ]]
    fillet(fillet1_edges, radius=FILLET1_R)

    # Tap Drill for M2x0.4 Tap6
    with Locations(Plane(origin=(3.946615568, 2.363096604, 2.401970743), x_dir=(-0.513716653023, 0.85795990606, 0), z_dir=(0.85795990606, 0.513716653023, 0))):
        with Locations((0, 0)):
            Hole(TAP_DRILL_FOR_M2X0_4_TAP6_D / 2, depth=TAP_DRILL_FOR_M2X0_4_TAP6_DEPTH)
            with Locations((0, 0, -(TAP_DRILL_FOR_M2X0_4_TAP6_DEPTH + TAP_DRILL_FOR_M2X0_4_TAP6_TIP / 2))):  # 118° drill point
                Cone(0, TAP_DRILL_FOR_M2X0_4_TAP6_D / 2, TAP_DRILL_FOR_M2X0_4_TAP6_TIP, mode=Mode.SUBTRACT)


solid = part.part
